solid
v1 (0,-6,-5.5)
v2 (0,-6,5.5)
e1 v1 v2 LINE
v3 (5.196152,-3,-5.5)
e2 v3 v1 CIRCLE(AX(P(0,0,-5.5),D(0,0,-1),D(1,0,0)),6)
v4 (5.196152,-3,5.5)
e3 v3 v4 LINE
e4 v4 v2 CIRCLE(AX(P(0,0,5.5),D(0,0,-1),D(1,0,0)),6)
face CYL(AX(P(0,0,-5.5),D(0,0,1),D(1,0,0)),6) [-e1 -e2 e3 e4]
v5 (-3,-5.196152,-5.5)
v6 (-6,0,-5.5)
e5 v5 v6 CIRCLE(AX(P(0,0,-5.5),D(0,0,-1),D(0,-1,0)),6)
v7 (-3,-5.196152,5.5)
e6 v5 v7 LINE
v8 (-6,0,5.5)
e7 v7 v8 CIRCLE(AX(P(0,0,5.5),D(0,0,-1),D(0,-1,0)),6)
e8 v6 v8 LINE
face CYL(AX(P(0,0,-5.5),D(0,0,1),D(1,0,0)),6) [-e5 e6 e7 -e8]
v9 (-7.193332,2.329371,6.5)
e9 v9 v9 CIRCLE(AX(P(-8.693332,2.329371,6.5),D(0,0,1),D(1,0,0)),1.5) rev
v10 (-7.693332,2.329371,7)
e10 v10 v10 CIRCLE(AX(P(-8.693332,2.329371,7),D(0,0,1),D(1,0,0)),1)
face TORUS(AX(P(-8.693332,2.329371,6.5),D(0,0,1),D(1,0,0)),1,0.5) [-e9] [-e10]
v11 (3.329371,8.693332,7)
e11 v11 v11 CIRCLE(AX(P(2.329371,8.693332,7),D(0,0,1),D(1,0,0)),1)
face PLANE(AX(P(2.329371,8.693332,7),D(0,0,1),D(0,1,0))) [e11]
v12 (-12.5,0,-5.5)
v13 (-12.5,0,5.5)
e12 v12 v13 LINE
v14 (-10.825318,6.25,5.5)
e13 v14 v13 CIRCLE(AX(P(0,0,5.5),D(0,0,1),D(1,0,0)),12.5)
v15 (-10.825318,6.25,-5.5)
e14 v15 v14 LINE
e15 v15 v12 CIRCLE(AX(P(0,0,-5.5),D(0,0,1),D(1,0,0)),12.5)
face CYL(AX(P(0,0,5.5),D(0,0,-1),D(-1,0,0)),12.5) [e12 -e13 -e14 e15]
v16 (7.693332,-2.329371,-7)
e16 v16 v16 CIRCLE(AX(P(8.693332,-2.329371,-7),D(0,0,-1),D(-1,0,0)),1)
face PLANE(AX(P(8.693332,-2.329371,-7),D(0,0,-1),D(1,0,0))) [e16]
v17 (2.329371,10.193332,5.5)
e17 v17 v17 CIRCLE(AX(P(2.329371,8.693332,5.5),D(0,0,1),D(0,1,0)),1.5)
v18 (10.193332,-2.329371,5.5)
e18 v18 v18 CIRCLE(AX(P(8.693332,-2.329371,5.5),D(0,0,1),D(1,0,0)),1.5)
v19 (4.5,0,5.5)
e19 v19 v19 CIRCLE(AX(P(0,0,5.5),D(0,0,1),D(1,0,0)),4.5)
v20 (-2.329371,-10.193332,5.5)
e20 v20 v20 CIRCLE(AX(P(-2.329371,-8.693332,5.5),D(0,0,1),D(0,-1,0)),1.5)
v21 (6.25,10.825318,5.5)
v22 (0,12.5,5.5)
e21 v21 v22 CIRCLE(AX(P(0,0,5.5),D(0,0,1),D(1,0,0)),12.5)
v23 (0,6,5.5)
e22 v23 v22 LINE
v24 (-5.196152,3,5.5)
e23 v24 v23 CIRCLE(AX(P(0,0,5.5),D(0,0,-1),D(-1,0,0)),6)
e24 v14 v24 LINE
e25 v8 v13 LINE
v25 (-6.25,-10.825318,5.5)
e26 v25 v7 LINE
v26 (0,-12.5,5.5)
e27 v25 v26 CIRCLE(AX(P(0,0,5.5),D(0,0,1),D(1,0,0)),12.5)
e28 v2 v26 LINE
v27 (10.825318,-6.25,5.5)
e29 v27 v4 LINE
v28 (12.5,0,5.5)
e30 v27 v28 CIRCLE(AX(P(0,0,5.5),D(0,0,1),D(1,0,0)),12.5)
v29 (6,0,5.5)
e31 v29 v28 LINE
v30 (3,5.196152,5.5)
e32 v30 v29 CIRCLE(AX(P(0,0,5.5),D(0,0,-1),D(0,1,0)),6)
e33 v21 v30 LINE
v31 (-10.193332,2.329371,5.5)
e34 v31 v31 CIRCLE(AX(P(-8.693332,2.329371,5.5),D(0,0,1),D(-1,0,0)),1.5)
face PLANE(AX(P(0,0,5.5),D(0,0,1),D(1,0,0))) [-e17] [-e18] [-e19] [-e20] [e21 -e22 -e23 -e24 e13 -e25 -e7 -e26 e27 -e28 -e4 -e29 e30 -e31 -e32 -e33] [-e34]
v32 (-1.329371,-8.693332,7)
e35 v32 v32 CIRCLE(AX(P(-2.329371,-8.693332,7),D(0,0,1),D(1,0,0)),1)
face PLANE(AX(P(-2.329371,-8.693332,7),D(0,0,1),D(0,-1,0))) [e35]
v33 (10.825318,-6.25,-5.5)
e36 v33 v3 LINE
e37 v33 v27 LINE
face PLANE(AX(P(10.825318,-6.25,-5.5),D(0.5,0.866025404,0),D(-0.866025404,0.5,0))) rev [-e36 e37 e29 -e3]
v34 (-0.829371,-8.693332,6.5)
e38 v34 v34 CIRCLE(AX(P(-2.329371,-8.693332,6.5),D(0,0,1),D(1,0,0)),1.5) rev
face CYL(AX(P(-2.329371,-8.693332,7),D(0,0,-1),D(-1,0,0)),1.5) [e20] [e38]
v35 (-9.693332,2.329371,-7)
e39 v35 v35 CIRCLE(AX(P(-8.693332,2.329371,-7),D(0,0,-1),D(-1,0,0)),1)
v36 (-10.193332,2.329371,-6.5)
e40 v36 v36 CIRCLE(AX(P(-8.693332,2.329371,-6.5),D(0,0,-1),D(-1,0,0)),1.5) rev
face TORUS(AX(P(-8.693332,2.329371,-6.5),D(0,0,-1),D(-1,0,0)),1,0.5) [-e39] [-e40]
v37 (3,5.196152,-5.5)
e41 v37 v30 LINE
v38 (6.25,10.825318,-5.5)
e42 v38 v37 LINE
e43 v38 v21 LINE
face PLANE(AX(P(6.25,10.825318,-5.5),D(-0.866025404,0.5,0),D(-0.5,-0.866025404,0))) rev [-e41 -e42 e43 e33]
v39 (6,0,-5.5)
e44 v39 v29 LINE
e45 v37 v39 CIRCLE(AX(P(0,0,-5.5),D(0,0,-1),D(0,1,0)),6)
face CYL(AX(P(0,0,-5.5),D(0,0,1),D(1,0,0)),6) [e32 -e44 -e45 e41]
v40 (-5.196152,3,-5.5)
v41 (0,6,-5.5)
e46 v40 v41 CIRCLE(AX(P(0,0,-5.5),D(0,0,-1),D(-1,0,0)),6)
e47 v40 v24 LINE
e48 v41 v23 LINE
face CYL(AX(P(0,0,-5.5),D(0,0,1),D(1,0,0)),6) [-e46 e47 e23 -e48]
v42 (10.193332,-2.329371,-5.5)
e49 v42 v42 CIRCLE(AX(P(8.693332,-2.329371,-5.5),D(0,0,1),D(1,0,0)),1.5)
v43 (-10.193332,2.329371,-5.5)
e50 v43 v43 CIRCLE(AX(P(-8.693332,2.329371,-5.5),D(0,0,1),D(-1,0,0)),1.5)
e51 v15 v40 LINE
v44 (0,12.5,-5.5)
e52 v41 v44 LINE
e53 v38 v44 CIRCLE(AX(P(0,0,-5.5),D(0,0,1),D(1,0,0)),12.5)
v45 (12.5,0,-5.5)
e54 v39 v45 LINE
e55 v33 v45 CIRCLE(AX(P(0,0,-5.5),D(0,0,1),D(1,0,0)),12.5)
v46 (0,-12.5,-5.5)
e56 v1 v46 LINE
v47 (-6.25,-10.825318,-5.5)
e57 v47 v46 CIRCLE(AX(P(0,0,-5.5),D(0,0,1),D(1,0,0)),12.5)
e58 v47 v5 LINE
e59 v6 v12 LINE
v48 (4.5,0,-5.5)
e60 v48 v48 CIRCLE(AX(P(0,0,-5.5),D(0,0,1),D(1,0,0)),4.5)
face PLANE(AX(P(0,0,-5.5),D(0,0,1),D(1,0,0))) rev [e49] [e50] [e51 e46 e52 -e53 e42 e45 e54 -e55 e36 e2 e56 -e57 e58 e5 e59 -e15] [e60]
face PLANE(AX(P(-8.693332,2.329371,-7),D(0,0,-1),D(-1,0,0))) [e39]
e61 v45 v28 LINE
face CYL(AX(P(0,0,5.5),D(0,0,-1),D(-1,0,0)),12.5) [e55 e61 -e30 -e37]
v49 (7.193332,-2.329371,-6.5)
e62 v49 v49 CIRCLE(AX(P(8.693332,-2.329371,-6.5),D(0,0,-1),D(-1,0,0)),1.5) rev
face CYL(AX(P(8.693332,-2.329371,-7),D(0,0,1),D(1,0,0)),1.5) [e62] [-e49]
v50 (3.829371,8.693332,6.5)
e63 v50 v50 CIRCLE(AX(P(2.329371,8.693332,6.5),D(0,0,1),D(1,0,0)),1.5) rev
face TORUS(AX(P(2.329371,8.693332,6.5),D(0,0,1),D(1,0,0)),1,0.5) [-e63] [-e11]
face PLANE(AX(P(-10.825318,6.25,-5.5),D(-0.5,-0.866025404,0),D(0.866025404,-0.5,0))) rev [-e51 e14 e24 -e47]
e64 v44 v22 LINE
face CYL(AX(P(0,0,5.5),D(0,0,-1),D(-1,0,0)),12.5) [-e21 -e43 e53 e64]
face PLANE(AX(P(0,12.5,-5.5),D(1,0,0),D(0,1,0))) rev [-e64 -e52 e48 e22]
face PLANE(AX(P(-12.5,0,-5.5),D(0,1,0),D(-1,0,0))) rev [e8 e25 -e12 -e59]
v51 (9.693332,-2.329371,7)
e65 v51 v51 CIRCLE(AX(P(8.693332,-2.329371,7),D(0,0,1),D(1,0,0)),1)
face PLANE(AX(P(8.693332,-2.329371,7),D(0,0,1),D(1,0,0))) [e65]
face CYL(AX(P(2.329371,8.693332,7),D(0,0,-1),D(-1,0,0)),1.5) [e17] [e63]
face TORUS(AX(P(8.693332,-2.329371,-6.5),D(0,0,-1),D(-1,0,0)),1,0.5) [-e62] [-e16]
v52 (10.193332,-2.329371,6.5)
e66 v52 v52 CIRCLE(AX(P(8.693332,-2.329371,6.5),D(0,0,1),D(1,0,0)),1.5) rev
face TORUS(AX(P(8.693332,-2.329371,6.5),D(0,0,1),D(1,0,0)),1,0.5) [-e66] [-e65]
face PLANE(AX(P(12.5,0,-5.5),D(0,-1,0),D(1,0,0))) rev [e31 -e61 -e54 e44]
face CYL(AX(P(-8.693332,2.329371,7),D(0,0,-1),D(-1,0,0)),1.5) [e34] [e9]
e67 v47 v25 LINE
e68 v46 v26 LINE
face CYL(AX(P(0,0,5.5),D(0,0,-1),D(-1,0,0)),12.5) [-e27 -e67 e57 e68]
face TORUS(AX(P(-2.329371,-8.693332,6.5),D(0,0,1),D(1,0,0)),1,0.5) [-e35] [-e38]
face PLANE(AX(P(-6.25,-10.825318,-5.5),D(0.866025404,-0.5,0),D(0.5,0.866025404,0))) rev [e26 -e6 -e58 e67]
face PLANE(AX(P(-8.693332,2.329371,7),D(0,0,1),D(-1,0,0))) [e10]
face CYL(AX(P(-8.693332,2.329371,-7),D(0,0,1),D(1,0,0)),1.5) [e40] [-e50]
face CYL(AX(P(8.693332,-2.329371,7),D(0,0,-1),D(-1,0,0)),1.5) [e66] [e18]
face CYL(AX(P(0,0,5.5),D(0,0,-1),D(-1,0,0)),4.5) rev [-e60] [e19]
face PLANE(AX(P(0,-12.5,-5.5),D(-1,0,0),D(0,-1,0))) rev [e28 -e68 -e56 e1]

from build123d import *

# Parameters (mm, degrees)
ESBO_O1_R                    = 12.5
ESBO_O1_R_2                  = 4.5
RESSALTO_EXTRUS_O1_DEPTH     = 5.5
CORTE_EXTRUS_O2_DEPTH        = 21.820662814
PADR_OCIRCULAR1_COUNT        = 4
ESBO_O4_R                    = 1.5
RESSALTO_EXTRUS_O2_DEPTH     = 1.5
FILETE1_R                    = 0.5
FILETE1_OF_ESPELHAR1_R       = 0.5
PADR_OCIRCULAR2_COUNT        = 4
FILETE1_OF_PADR_OCIRCULAR2_R = 0.5


# Read off the part's stored shape, not the designer's step: PadrãoCircular3
with BuildPart() as part:
    # Esboço1 → Ressalto-extrusão1 (new, symmetric)
    with BuildSketch(Plane.XY):
        Circle(ESBO_O1_R)
        Circle(ESBO_O1_R_2, mode=Mode.SUBTRACT)
    extrude(amount=RESSALTO_EXTRUS_O1_DEPTH, both=True)

    # Esboço3 → Corte-extrusão2 (cut, through all)
    with BuildSketch(Plane.XY.offset(5.5)):
        with BuildLine():
            Line((-10.825317547, 6.25), (-5.196152423, 3))
            ThreePointArc((-5.196152423, 3), (-3, 5.196152423), (0, 6))
            Line((0, 6), (0, 12.5))
            ThreePointArc((0, 12.5), (-6.25, 10.825317547), (-10.825317547, 6.25))
        make_face()
    corte_extrus_o2 = extrude(amount=-CORTE_EXTRUS_O2_DEPTH, mode=Mode.SUBTRACT)

    # PadrãoCircular1: Corte-extrusão2 ×4 about axis
    padr_ocircular1_axis = Axis((0, 0, 5.5), (0, 0, -1))
    for i in range(1, PADR_OCIRCULAR1_COUNT):
        add(corte_extrus_o2.rotate(padr_ocircular1_axis, i * 360 / PADR_OCIRCULAR1_COUNT), mode=Mode.SUBTRACT)

    # Esboço4 → Ressalto-extrusão2 (add)
    with BuildSketch(Plane.XY.offset(5.5)):
        with Locations((8.693332437, -2.329371406)):
            Circle(ESBO_O4_R)
    ressalto_extrus_o2 = extrude(amount=RESSALTO_EXTRUS_O2_DEPTH)

    # Filete1
    filete1_edges = [part.edges().sort_by_distance(p)[0] for p in [
        (7.193332437, -2.329371406, 7),
    ]]
    fillet(filete1_edges, radius=FILETE1_R)

    # Espelhar1: Ressalto-extrusão2 across plane
    add(ressalto_extrus_o2.mirror(Plane.XY))

    # Filete1 of Espelhar1
    filete1_of_espelhar1_edges = [part.edges().sort_by_distance(p)[0] for p in [
        (7.193332437, -2.329371406, -7),
    ]]
    fillet(filete1_of_espelhar1_edges, radius=FILETE1_OF_ESPELHAR1_R)

    # PadrãoCircular2: Ressalto-extrusão2 ×4 about axis
    padr_ocircular2_axis = Axis((0, 0, 0), (0, 0, 1))
    for i in range(1, PADR_OCIRCULAR2_COUNT):
        add(ressalto_extrus_o2.rotate(padr_ocircular2_axis, i * 360 / PADR_OCIRCULAR2_COUNT))

    # Filete1 of PadrãoCircular2
    filete1_of_padr_ocircular2_edges = [part.edges().sort_by_distance(p)[0] for p in [
        (2.329371406, 7.193332437, 7),
        (-7.193332437, 2.329371406, 7),
        (-2.329371406, -7.193332437, 7),
    ]]
    fillet(filete1_of_padr_ocircular2_edges, radius=FILETE1_OF_PADR_OCIRCULAR2_R)

    # PadrãoCircular3 outline → PadrãoCircular3 (revolve)
    with BuildSketch(Plane(origin=(-8.693332437, 2.329371406, 0), x_dir=(1, 0, 0), z_dir=(0, -1, 0))):
        with BuildLine():
            Line((0, -5.5), (0, -7))
            Line((0, -7), (1, -7))
            ThreePointArc((1, -7), (1.353553391, -6.853553391), (1.5, -6.5))
            Line((1.5, -6.5), (1.5, -5.5))
            Line((1.5, -5.5), (0, -5.5))
        make_face()
    revolve(axis=Axis((-8.693332437, 2.329371406, 0), (0, 0, 1)))


solid = part.part
